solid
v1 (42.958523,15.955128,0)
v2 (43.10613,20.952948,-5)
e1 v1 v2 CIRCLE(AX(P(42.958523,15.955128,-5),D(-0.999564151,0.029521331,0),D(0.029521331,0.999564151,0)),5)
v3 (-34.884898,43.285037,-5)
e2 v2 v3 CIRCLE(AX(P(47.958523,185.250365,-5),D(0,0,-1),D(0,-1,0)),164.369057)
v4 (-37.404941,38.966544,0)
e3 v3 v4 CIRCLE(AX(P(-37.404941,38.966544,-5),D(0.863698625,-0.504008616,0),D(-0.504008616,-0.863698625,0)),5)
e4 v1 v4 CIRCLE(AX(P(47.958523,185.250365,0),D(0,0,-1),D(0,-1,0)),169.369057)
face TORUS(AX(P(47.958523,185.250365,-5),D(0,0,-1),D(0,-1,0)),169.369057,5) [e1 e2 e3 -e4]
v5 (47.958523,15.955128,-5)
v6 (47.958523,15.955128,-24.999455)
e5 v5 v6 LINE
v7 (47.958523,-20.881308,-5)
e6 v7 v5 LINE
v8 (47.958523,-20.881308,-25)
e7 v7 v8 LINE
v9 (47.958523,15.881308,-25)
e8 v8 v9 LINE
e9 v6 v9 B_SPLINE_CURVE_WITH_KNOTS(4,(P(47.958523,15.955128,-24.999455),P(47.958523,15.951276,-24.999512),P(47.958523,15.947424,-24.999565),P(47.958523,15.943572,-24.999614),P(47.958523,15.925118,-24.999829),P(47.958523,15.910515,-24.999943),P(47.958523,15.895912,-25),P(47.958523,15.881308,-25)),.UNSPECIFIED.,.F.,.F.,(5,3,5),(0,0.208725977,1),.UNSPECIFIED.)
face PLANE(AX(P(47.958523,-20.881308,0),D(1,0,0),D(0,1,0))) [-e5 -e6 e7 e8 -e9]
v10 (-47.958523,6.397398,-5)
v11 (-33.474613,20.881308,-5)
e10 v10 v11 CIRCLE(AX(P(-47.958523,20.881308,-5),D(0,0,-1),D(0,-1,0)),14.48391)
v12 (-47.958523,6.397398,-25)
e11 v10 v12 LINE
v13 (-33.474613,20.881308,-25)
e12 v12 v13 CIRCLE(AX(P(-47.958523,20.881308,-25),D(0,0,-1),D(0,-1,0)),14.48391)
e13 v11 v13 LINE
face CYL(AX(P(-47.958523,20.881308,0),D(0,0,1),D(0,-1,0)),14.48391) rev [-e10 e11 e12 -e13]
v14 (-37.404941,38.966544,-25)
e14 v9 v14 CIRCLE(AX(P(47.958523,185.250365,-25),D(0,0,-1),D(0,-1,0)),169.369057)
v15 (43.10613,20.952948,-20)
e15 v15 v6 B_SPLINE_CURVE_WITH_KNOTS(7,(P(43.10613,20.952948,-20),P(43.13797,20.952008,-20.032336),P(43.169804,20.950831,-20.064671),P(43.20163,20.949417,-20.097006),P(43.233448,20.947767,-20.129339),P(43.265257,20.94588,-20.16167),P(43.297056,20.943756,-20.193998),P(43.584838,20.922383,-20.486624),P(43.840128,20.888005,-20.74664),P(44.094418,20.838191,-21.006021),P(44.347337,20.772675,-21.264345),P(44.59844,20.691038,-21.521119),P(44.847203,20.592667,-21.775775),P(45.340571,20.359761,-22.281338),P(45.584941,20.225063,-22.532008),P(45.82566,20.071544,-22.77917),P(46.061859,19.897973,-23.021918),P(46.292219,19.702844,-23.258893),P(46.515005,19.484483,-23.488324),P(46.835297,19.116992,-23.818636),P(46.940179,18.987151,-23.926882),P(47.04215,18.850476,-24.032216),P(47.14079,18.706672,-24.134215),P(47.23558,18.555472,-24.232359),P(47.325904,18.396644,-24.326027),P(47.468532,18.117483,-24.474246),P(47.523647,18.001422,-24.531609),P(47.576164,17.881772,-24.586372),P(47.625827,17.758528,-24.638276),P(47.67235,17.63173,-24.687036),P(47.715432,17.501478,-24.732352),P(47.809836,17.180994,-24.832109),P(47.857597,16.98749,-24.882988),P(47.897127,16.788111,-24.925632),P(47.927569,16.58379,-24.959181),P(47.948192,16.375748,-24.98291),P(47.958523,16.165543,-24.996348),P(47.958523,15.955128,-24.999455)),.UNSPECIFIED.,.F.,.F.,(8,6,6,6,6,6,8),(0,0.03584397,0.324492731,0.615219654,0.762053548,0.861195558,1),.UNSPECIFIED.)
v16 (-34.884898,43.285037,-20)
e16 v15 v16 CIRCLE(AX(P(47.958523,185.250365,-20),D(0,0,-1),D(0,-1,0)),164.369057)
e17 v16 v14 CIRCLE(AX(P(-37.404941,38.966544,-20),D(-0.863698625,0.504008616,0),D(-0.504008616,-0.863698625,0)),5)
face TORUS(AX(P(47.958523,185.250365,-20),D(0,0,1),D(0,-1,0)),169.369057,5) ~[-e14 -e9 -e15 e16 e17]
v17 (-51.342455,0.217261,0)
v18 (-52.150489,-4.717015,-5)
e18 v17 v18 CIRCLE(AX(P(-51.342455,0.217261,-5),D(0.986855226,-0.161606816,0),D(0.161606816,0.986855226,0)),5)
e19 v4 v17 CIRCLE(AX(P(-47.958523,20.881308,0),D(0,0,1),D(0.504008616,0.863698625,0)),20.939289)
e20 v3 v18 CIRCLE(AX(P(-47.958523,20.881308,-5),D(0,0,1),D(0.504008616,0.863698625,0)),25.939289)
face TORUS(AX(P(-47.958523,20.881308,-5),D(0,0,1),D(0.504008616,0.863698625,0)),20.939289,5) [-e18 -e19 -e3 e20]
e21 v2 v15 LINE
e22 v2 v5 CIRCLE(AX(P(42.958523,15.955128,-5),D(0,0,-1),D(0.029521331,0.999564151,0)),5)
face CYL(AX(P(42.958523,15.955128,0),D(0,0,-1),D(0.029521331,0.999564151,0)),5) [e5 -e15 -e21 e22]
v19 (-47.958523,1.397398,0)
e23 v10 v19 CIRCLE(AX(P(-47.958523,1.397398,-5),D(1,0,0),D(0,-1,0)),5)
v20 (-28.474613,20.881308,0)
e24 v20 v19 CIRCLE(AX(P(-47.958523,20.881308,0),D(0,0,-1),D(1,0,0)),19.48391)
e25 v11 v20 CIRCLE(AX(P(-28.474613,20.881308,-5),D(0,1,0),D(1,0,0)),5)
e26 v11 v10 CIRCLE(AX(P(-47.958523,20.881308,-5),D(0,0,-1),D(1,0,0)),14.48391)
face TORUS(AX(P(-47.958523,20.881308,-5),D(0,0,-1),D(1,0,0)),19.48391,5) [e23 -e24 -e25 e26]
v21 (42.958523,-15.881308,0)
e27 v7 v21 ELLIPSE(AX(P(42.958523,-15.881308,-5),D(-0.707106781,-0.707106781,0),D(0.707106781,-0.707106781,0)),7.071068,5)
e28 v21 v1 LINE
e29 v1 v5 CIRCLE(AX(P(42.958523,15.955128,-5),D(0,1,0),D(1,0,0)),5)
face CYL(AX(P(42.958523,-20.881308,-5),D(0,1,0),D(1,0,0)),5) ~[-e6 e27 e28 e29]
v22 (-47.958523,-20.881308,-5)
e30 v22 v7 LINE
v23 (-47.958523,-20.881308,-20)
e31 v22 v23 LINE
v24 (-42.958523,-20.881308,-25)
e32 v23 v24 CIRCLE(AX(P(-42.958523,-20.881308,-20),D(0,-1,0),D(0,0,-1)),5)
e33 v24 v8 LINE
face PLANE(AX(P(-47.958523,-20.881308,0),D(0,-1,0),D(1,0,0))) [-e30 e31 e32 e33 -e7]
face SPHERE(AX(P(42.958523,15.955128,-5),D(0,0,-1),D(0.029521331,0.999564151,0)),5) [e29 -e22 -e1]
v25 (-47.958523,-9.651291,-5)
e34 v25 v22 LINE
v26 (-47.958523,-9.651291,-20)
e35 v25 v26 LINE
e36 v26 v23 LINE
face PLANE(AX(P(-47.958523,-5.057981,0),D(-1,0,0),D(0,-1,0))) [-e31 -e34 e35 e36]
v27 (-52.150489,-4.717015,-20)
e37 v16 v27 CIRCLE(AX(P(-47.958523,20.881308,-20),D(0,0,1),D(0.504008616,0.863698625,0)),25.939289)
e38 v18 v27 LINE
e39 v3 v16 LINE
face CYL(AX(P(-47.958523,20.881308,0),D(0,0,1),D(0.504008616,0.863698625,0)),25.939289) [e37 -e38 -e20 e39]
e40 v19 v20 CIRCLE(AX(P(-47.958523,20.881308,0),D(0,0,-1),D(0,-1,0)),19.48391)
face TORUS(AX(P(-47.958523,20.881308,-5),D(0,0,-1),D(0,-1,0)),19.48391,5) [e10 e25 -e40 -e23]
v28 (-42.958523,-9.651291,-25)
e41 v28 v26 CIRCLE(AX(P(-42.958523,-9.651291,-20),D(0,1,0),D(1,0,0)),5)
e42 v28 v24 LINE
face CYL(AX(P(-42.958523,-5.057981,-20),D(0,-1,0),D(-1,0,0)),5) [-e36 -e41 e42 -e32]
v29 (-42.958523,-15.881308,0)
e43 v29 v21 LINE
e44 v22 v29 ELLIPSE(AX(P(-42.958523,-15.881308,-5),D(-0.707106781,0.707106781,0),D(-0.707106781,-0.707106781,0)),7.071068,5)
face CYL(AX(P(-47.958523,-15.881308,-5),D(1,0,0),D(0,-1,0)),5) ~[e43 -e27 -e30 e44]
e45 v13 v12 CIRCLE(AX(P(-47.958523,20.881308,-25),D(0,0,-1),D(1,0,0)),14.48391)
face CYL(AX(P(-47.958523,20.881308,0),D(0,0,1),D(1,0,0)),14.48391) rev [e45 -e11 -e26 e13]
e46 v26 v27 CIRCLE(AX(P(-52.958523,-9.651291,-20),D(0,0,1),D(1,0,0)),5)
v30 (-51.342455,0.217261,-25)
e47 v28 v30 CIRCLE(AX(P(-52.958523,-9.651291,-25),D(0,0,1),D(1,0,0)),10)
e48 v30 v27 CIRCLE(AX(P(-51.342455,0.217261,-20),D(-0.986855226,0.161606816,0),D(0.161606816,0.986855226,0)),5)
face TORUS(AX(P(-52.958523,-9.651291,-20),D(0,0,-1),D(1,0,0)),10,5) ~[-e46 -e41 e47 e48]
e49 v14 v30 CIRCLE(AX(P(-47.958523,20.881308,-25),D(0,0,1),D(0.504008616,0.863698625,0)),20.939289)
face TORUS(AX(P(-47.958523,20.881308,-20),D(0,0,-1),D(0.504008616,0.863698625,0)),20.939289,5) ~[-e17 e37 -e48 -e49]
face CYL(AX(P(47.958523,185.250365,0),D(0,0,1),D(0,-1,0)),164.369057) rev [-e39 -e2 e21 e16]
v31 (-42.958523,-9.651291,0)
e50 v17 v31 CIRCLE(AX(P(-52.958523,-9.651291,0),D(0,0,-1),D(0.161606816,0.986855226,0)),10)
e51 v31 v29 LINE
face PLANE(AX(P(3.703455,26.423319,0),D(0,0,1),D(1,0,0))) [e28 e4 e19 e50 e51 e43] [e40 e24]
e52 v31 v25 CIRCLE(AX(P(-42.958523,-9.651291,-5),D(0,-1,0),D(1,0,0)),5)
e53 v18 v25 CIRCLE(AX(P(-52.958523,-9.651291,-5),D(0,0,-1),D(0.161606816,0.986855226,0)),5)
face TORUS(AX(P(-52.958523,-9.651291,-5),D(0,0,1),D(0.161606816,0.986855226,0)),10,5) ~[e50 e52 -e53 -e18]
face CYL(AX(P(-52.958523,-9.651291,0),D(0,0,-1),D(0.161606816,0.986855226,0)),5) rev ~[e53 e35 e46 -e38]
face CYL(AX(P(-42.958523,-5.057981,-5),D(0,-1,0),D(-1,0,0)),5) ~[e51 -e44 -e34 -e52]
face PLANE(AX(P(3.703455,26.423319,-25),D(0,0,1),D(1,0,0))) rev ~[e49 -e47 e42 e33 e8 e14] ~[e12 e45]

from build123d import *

# Parameters (mm, degrees)
F1_DEPTH = 25
F3_R     = 5


# Not quite as in the source:
# - the program builds the solid bodies; features that only make, move or delete a surface that nothing else refers to are left out


with BuildPart() as f1:
    # F0 (on Top) → F1 (new body)
    with BuildSketch(Plane.XY):
        with BuildLine():
            Line((-22.0192338504, 20.8813082427), (47.958523035, 20.8813082427))
            ThreePointArc((47.958523035, 20.8813082427), (5.048852146, 26.5810643591), (-34.884897805, 43.2850366545))
            ThreePointArc((-34.884897805, 43.2850366545), (-25.4644430478, 33.7988578917), (-22.0192338504, 20.8813082427))
        make_face()
        with BuildLine():
            ThreePointArc((-34.884897805, 43.2850366545), (-72.9983264837, 27.652937785), (-47.958523035, -5.057980942))
            Line((-47.958523035, -5.057980942), (-47.958523035, 6.3973983269))
            ThreePointArc((-47.958523035, 6.3973983269), (-58.2001939546, 31.1229791622), (-33.4746131192, 20.8813082427))
            Line((-33.4746131192, 20.8813082427), (-22.0192338504, 20.8813082427))
            ThreePointArc((-22.0192338504, 20.8813082427), (-25.4644430478, 33.7988578917), (-34.884897805, 43.2850366545))
        make_face()
        with BuildLine():
            Line((-47.958523035, 6.3973983269), (-47.958523035, -5.057980942))
            ThreePointArc((-47.958523035, -5.057980942), (-29.6166757534, 2.539460961), (-22.0192338504, 20.8813082427))
            Line((-22.0192338504, 20.8813082427), (-33.4746131192, 20.8813082427))
            ThreePointArc((-33.4746131192, 20.8813082427), (-37.7168521155, 10.6396373231), (-47.958523035, 6.3973983269))
        make_face()
        with BuildLine():
            Line((-47.958523035, -5.057980942), (-47.958523035, -20.8813082427))
            Line((-47.958523035, -20.8813082427), (47.958523035, -20.8813082427))
            Line((47.958523035, -20.8813082427), (47.958523035, 20.8813082427))
            Line((47.958523035, 20.8813082427), (-22.0192338504, 20.8813082427))
            ThreePointArc((-22.0192338504, 20.8813082427), (-29.6166757534, 2.539460961), (-47.958523035, -5.057980942))
        make_face()
    extrude(amount=-F1_DEPTH)

    # F3
    f3_edges = [f1.edges().sort_by_distance(p)[0] for p in [
        (5.048852, 26.581064, 0),
        (-72.998326, 27.652938, 0),
        (-47.958523, -12.969645, 0),
        (0, -20.881308, 0),
        (47.958523, 0, 0),
        (-62.442433, 20.881308, 0),
        (47.958523, 20.881308, -12.5),
        (-34.884898, 43.285037, -12.5),
        (5.048852, 26.581064, -25),
        (-47.958523, -5.057981, -12.5),
        (-72.998326, 27.652938, -25),
        (-47.958523, -12.969645, -25),
    ]]
    fillet(f3_edges, radius=F3_R)


solid = f1.part
